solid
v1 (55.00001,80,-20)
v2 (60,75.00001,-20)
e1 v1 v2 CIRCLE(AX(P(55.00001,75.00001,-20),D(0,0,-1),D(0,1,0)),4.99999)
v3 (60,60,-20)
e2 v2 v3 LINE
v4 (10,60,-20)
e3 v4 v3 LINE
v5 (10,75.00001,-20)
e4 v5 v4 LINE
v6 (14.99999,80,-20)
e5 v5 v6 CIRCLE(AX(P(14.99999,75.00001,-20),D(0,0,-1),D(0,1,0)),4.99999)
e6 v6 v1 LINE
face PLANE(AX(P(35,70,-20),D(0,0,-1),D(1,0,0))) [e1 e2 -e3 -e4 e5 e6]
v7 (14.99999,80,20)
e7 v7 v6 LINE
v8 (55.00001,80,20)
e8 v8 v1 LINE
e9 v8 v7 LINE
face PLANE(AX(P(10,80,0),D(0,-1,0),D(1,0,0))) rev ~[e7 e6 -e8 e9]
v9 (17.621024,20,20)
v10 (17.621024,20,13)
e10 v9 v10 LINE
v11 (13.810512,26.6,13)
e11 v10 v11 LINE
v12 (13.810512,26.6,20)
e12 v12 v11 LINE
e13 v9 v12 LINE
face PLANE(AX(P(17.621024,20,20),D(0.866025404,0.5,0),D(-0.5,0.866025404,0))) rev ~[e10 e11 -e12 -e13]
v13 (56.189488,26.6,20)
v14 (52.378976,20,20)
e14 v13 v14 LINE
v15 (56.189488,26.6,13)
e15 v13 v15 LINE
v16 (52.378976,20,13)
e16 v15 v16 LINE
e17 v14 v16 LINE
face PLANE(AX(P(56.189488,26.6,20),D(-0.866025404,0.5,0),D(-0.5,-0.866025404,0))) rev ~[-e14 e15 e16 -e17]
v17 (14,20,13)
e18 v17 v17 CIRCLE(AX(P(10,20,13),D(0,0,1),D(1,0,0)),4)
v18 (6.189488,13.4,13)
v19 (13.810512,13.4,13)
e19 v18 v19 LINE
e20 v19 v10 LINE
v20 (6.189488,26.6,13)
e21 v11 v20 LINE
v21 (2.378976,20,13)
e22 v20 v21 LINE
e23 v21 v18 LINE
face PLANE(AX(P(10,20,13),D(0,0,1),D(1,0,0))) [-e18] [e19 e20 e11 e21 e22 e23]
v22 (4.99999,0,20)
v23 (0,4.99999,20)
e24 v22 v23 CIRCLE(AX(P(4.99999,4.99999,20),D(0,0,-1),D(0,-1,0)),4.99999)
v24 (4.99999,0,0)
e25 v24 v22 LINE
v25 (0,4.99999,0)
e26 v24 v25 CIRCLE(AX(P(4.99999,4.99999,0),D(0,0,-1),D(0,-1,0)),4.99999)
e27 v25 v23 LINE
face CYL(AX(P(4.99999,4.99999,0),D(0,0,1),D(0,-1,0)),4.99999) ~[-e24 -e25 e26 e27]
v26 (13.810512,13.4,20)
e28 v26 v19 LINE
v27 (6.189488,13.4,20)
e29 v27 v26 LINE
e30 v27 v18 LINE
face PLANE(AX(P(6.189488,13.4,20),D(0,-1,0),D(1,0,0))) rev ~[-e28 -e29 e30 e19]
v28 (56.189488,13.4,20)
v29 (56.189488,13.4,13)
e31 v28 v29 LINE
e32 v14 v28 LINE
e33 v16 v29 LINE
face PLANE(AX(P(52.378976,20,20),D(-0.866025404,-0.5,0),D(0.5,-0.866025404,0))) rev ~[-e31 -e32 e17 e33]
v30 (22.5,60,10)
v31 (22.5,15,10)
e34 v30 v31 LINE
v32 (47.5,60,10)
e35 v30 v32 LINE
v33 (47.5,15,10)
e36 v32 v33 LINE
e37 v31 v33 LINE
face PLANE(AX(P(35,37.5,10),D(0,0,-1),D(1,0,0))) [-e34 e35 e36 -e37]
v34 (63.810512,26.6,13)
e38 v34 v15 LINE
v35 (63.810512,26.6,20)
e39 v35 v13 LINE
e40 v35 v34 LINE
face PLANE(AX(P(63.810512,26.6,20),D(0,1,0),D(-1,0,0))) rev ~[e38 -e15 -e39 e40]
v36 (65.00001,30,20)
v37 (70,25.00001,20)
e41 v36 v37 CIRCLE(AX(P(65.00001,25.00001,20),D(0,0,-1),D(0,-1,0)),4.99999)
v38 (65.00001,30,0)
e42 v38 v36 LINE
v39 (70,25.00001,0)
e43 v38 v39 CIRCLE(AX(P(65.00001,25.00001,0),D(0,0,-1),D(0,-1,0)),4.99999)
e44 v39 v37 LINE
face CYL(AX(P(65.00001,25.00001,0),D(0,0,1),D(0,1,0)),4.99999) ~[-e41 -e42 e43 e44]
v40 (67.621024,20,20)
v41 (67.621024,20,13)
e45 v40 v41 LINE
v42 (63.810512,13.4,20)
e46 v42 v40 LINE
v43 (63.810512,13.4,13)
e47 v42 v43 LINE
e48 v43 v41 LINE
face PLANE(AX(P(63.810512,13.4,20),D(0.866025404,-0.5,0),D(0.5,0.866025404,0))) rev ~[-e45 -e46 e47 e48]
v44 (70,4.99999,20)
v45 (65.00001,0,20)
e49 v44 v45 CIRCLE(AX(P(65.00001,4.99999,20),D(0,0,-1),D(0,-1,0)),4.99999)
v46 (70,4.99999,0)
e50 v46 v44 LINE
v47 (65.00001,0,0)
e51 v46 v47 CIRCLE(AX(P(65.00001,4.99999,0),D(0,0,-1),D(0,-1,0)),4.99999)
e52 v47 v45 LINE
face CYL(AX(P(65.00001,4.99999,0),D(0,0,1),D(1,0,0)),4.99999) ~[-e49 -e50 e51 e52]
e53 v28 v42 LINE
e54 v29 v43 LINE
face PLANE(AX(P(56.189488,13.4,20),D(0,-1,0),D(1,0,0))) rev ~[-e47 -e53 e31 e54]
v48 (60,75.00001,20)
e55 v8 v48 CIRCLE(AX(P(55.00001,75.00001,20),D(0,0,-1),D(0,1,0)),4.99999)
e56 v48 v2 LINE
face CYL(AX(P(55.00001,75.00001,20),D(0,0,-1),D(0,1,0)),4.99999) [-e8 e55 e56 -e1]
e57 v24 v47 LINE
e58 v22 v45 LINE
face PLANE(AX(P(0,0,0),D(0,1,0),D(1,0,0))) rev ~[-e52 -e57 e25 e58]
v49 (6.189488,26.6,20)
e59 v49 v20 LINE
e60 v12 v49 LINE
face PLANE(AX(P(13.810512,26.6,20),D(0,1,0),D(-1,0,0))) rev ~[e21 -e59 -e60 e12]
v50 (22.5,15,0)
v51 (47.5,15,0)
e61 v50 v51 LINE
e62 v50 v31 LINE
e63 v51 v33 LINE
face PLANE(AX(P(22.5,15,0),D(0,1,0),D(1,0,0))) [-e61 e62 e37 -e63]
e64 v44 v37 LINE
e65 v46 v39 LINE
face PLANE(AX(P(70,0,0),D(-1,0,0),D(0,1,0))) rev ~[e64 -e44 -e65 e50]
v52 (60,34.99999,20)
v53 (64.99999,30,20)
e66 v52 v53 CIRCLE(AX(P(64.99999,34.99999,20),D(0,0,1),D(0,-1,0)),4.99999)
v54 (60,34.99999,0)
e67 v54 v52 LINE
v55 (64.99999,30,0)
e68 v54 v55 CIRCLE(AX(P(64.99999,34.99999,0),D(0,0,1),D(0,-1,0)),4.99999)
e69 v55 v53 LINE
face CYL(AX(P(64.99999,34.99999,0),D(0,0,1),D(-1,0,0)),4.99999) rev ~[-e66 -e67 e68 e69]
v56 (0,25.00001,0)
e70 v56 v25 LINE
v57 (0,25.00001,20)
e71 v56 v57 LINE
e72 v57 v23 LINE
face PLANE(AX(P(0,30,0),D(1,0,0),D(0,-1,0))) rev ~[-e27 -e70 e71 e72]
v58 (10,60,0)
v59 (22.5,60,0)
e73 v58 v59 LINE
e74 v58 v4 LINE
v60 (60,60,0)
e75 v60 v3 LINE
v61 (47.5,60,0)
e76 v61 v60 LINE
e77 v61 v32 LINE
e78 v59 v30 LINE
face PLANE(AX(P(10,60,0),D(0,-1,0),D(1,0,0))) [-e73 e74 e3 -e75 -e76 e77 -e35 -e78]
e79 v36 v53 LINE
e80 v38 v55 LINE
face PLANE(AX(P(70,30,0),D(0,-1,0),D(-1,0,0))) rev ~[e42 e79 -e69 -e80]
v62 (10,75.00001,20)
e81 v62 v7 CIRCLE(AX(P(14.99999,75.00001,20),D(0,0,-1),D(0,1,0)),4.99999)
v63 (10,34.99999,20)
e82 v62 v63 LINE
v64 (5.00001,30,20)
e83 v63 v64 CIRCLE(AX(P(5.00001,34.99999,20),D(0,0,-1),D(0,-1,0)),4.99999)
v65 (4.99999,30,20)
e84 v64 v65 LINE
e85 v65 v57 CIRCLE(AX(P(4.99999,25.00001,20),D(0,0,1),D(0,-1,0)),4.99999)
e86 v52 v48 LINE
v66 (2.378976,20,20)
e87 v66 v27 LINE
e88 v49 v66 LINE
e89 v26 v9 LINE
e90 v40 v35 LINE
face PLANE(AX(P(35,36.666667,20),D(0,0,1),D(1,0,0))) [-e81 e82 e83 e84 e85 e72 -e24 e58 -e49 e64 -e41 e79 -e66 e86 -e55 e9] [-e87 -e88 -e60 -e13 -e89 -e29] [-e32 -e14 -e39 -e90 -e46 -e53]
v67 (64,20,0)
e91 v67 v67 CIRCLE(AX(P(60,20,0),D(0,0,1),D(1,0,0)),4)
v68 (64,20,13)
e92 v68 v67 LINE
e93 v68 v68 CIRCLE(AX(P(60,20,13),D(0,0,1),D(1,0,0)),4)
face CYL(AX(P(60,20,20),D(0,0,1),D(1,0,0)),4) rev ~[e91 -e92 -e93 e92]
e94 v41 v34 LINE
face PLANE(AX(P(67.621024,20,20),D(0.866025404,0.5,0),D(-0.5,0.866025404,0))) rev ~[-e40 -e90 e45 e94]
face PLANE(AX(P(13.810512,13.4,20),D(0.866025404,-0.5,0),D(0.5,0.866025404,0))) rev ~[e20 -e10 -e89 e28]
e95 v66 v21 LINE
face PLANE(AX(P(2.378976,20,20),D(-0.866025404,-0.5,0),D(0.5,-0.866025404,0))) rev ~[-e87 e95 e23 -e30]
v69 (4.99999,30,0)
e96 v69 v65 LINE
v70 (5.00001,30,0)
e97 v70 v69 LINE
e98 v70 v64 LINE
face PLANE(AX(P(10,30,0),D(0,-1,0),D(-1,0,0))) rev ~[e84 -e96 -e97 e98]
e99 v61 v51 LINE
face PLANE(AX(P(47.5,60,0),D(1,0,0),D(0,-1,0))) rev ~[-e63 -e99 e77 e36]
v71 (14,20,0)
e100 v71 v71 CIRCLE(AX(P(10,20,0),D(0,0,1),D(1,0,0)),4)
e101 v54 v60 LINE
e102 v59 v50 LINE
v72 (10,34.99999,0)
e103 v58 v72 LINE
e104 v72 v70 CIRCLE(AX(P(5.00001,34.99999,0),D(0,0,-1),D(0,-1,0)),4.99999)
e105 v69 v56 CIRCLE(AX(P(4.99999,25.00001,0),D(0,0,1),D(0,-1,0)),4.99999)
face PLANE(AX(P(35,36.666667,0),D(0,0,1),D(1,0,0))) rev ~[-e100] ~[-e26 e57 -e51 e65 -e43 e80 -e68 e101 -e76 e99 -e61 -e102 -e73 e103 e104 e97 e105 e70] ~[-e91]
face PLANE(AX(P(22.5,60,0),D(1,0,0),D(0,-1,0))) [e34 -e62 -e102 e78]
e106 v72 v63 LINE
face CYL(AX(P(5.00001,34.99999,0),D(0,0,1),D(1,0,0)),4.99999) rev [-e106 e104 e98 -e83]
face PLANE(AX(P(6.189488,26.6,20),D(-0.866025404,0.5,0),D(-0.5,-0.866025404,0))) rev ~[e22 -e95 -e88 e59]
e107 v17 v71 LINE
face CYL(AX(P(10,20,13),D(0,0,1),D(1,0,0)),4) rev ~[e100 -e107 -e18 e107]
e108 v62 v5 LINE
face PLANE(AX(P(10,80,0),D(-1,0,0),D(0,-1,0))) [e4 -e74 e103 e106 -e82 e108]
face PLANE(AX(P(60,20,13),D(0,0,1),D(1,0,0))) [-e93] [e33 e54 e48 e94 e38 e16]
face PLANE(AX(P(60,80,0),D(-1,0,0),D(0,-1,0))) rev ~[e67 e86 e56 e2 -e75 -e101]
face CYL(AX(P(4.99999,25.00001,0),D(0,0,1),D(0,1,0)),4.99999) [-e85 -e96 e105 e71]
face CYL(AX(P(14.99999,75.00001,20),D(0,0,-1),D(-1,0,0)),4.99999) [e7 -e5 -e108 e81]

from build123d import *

# Parameters (mm, degrees)
F1_DEPTH  = 20
F3_DEPTH  = 7
F4_R      = 4
F5_DEPTH  = 13.001
F6_R      = 4
F7_DEPTH  = 20.001
F8_W      = 50
F8_H      = 20
F9_DEPTH  = 20
F10_W     = 25
F10_H     = 45
F11_DEPTH = 10
F12_R     = 4.99999


# Not quite as in the source:
# - a fillet or chamfer is up to 0.001 mm smaller than in the source, because OpenCascade refuses the exact size


with BuildPart() as f1:
    # F0 (on Top) → F1 (new body)
    with BuildSketch(Plane.XY):
        Polygon((0, 30), (0, 0), (70, 0), (70, 30), (60, 30), (60, 80), (10, 80), (10, 30), align=None)
    extrude(amount=F1_DEPTH)

    # F2 (on face) → F3 (cut)
    with BuildSketch(Plane.XY.offset(20)):
        Polygon((63.8105117767, 13.4), (67.6210235533, 20), (63.8105117767, 26.6), (56.1894882233, 26.6), (52.3789764467, 20), (56.1894882233, 13.4), align=None)
        Polygon((17.6210235533, 20), (13.8105117767, 26.6), (6.1894882233, 26.6), (2.3789764467, 20), (6.1894882233, 13.4), (13.8105117767, 13.4), align=None)
    extrude(amount=-F3_DEPTH, mode=Mode.SUBTRACT)

    # F4 (on face) → F5 (cut, through all)
    with BuildSketch(Plane.XY.offset(13)):
        with Locations((10, 20)):
            Circle(F4_R)
    extrude(amount=-F5_DEPTH, mode=Mode.SUBTRACT)

    # F6 (on face) → F7 (cut, through all)
    with BuildSketch(Plane.XY.offset(20)):
        with Locations((60, 20)):
            Circle(F6_R)
    extrude(amount=-F7_DEPTH, mode=Mode.SUBTRACT)

    # F8 (on face) → F9 (join)
    with BuildSketch(Plane(origin=(0, 0, 0), x_dir=(1, 0, 0), z_dir=(0, 0, -1))):
        with Locations((35, -70)):
            Rectangle(F8_W, F8_H)
    extrude(amount=F9_DEPTH)

    # F10 (on face) → F11 (cut)
    with BuildSketch(Plane(origin=(0, 0, 0), x_dir=(1, 0, 0), z_dir=(0, 0, -1))):
        with Locations((35, -37.5)):
            Rectangle(F10_W, F10_H)
    extrude(amount=-F11_DEPTH, mode=Mode.SUBTRACT)

    # F12 (radius 5 in the source; OpenCascade refuses exactly that, so slightly less here)
    f12_edges = [f1.edges().sort_by_distance(p)[0] for p in [
        (10, 80, 0),
        (10, 30, 10),
        (60, 30, 10),
        (70, 30, 10),
        (70, 0, 10),
        (0, 0, 10),
        (0, 30, 10),
        (60, 80, 0),
    ]]
    fillet(f12_edges, radius=F12_R)


solid = f1.part
